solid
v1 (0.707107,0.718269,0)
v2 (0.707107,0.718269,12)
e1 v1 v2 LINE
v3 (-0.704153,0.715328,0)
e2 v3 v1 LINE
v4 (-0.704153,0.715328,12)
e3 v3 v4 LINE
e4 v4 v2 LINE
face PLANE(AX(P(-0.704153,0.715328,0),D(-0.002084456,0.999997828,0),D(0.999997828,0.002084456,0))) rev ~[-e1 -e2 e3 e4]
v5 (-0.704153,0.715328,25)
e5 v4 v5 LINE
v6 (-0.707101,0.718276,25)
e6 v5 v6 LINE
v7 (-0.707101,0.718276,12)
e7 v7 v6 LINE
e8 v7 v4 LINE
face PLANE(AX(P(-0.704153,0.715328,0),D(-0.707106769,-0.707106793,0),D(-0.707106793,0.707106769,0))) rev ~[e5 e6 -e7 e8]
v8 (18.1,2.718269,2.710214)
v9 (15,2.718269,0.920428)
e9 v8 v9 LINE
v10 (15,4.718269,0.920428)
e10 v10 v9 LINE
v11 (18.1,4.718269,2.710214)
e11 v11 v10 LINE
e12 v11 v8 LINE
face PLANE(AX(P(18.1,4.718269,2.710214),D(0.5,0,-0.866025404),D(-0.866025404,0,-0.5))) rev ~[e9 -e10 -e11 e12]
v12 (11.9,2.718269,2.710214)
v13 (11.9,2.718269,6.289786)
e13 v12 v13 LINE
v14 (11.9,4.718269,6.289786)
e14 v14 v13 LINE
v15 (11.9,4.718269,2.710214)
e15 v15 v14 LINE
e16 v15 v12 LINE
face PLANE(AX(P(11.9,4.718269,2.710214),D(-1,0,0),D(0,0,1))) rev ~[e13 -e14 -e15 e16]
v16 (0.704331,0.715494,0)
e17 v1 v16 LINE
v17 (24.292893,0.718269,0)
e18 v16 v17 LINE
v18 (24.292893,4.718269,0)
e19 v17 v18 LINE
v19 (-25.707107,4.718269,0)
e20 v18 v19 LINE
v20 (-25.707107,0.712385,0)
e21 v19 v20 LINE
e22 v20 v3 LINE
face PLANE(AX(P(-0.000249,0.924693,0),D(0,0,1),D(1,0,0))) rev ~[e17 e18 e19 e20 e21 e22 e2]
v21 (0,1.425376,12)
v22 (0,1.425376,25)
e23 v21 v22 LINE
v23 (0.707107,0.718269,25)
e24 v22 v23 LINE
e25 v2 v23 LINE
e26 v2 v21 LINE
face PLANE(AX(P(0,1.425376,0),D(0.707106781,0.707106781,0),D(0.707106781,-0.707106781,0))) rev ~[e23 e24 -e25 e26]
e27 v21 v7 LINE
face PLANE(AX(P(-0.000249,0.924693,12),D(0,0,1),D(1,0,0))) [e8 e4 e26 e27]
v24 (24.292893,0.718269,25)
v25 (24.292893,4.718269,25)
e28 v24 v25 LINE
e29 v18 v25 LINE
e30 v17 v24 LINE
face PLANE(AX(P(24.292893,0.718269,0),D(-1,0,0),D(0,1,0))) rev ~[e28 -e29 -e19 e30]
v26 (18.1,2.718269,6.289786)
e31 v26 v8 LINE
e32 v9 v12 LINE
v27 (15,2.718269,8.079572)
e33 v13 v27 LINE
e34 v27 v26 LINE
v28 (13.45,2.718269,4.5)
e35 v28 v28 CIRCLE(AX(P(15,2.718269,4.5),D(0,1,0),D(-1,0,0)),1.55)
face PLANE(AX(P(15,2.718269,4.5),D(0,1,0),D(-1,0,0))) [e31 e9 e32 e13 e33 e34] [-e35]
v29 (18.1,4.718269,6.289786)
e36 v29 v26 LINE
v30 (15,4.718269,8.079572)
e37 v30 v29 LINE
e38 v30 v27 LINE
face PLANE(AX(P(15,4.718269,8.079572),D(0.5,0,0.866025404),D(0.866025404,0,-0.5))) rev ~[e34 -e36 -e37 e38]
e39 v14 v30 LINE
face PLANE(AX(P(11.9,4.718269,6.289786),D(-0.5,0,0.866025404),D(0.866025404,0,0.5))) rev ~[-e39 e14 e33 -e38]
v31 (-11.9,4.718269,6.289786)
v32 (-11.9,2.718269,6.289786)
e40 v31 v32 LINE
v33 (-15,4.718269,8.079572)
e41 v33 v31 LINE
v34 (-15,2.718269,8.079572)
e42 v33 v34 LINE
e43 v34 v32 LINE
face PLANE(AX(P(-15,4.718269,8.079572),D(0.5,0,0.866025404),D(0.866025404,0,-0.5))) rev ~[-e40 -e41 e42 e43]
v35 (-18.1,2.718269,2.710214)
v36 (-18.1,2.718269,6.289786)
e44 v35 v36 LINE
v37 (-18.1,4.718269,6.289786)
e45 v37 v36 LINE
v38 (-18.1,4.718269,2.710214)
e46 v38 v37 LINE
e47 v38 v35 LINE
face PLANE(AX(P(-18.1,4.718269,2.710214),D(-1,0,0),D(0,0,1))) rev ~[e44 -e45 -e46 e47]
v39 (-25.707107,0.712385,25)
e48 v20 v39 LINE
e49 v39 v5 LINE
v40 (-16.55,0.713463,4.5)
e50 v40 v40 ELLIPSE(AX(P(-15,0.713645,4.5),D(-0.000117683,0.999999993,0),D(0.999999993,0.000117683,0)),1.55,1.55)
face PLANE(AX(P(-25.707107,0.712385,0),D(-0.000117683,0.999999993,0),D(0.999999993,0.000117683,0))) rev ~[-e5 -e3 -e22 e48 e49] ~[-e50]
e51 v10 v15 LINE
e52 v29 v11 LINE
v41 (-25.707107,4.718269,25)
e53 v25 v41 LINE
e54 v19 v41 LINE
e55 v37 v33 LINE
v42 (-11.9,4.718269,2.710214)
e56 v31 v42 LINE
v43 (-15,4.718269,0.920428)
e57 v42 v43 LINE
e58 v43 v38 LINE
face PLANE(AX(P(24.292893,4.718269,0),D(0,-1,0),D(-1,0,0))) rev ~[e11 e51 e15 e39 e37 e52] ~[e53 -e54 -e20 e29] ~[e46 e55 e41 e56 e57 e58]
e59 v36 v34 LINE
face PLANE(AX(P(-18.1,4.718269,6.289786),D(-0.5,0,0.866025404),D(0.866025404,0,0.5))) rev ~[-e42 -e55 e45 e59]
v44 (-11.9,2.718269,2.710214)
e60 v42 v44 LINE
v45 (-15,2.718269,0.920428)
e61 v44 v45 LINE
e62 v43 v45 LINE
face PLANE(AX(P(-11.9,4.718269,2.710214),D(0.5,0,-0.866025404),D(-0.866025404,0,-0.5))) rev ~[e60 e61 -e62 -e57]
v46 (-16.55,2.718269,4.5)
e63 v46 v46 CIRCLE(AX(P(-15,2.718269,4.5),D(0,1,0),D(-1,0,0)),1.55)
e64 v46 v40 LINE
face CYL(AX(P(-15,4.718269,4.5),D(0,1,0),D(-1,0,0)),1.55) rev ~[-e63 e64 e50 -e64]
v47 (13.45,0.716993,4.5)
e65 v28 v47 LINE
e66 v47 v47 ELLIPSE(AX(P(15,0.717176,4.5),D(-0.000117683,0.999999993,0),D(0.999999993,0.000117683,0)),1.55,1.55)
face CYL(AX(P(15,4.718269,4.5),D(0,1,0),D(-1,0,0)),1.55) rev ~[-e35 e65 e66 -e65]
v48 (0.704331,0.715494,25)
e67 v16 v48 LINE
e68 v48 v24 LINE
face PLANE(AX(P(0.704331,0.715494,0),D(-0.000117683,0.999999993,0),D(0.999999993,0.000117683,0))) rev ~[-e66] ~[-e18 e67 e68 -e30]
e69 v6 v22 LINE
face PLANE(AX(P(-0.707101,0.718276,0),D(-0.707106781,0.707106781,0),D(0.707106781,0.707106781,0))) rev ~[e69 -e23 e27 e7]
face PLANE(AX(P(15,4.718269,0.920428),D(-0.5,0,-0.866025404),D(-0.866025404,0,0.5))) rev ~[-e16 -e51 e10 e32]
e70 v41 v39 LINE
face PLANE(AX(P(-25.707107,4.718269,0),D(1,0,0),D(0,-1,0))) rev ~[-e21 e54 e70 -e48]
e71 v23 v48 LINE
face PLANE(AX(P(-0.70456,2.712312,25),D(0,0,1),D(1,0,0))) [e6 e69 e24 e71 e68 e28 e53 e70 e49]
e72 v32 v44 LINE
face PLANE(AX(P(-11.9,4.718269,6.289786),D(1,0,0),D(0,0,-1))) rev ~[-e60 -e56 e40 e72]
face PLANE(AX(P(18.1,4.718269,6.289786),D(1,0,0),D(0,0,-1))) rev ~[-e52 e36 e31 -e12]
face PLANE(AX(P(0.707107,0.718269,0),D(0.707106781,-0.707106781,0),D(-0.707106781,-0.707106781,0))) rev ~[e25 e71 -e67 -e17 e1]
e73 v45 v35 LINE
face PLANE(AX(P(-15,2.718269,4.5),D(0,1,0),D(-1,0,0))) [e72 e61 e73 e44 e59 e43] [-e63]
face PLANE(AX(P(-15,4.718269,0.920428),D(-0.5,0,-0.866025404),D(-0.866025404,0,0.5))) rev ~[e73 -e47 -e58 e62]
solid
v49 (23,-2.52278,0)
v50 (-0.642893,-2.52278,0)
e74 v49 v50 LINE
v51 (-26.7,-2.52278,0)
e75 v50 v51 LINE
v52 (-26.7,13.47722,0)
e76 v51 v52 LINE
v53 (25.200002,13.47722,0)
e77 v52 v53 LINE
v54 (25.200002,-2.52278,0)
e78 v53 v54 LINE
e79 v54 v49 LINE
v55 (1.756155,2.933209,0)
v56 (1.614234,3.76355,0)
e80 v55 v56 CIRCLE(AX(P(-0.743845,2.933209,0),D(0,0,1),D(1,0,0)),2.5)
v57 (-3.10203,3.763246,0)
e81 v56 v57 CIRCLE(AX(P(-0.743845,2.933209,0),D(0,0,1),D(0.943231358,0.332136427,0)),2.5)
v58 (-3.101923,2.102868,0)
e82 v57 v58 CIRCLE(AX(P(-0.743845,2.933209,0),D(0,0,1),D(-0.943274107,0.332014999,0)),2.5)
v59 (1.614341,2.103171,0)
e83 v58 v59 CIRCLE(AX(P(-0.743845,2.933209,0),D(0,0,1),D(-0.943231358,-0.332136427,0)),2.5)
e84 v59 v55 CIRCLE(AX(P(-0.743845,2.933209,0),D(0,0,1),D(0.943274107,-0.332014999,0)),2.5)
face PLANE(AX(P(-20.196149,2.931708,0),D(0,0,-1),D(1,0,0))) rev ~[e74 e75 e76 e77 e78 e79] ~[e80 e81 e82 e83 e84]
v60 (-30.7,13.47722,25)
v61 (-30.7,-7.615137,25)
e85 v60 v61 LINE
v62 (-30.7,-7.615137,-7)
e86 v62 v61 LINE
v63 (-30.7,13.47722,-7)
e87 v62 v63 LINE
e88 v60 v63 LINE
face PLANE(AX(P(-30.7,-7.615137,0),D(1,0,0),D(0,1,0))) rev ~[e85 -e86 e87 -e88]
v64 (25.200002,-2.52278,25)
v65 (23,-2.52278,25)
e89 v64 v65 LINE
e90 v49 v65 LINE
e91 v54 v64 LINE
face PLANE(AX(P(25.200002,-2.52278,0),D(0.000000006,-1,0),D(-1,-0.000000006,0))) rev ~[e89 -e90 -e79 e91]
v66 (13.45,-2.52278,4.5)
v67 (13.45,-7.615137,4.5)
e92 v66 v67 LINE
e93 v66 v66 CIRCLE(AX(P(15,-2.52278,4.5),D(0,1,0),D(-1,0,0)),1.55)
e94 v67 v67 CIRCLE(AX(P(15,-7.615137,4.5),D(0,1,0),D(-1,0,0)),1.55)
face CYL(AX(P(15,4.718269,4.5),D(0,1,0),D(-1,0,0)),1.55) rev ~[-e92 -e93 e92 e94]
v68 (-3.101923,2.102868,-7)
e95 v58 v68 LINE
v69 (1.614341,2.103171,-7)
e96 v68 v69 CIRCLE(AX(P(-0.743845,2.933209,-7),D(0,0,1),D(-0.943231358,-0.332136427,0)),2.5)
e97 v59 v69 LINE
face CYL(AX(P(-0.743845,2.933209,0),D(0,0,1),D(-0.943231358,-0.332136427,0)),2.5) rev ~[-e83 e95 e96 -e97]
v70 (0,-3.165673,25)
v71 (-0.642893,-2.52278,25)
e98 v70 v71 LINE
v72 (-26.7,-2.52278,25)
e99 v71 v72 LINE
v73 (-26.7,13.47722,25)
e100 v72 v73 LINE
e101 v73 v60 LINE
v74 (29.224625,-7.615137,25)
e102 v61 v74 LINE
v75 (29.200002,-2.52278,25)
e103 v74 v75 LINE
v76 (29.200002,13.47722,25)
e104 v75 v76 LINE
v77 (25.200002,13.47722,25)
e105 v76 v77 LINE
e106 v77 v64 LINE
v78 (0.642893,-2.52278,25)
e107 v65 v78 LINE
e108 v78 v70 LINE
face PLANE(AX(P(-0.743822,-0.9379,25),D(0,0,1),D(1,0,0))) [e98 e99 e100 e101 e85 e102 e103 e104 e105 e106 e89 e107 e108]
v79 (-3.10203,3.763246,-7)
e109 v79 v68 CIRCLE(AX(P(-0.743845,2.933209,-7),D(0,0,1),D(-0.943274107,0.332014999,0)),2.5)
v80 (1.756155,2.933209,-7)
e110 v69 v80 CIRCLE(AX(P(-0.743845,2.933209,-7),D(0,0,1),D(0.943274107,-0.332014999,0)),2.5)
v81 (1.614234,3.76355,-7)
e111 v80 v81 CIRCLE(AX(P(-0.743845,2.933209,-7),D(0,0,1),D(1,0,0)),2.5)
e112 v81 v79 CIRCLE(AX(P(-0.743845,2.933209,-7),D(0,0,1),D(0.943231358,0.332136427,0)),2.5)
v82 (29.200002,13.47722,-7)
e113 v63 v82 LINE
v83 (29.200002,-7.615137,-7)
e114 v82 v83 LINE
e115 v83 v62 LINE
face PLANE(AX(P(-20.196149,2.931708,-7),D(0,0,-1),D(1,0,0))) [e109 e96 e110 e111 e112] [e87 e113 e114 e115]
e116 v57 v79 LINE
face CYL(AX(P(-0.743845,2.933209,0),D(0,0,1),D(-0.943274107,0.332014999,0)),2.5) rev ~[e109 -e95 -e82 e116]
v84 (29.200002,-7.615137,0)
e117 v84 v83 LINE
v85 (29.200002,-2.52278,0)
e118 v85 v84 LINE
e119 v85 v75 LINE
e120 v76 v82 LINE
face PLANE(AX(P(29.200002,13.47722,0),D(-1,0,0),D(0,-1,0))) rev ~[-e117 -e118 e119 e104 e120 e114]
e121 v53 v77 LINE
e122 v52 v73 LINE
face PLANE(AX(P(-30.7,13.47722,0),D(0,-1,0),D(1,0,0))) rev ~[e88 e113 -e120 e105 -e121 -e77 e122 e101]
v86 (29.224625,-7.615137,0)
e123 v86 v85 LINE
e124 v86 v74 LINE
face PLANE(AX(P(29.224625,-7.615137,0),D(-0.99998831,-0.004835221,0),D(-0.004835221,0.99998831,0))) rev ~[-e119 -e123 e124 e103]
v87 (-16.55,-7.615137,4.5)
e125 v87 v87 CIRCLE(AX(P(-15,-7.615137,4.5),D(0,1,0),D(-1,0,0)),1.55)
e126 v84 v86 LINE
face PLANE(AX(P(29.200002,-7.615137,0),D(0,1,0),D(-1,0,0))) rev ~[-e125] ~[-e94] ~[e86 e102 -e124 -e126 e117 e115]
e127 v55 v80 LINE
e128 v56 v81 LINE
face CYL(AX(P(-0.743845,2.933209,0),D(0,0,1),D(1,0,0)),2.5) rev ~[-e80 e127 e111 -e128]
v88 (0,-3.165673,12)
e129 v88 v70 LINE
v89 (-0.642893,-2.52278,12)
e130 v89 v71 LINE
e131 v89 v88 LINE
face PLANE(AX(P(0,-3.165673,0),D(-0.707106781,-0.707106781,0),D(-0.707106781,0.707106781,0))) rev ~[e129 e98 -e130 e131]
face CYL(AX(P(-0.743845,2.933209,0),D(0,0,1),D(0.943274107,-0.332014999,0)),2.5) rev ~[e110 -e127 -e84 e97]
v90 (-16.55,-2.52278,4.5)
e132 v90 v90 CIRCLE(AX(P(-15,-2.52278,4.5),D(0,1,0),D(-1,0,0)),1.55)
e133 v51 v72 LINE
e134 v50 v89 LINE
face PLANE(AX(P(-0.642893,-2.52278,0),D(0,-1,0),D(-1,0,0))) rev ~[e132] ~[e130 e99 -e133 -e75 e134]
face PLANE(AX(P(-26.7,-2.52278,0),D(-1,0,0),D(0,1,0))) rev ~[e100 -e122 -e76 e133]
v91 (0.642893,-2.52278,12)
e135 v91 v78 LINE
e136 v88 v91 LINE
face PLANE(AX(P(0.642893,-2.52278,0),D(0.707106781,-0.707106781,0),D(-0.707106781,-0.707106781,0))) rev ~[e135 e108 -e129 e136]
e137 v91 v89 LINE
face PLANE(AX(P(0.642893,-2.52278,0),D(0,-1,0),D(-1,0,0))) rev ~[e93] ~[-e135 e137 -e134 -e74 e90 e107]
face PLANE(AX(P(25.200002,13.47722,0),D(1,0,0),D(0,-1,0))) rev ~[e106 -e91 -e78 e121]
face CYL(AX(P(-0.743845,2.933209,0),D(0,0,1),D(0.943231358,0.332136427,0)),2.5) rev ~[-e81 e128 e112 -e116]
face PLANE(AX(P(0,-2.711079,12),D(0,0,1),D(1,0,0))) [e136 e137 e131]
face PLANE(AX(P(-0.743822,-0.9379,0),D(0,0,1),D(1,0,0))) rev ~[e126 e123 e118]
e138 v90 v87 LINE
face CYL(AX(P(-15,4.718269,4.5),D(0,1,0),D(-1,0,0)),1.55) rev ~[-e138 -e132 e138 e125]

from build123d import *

# Parameters (mm, degrees)
F1_DEPTH = 25
F2_R     = 1.55
F3_DEPTH = 2
F4_DEPTH = 25
F6_DEPTH = 7
F7_DEPTH = 12


with BuildPart() as f1:
    # F0 (on Top) → F1 (new body)
    with BuildSketch(Plane.XY):
        Polygon((0, -3.165672766), (-0.6428928915, -2.5227798745), (-26.700000003, -2.5227798615), (-26.700000003, 13.4772201385), (-30.700000003, 13.4772201385), (-30.700000003, -2.5227798615), (-30.700000003, -7.615136914), (29.2246248573, -7.615136914), (29.2000018954, -2.5227798615), (29.2000018954, 13.4772201385), (25.2000018954, 13.4772201385), (25.2000018954, -2.5227798615), (23, -2.5227798745), (0.6428928915, -2.5227798745), align=None)
    extrude(amount=F1_DEPTH)


with BuildPart() as f1b:
    # F0 (on Top) → F1, piece 2 (new body)
    with BuildSketch(Plane.XY):
        Polygon((-0.7071006365, 0.7182756418), (0, 1.4253762783), (0.7071067812, 0.7182694971), (0.7043308199, 0.7154935358), (24.2928932188, 0.7182694971), (24.2928932188, 4.7182694971), (-25.7071067812, 4.7182694971), (-25.7071067812, 0.7123853715), (-0.7041527766, 0.715327782), align=None)
    extrude(amount=F1_DEPTH)

    # F2 (on face) → F3 (cut)
    with BuildSketch(Plane(origin=(0, 4.7182694971, 0), x_dir=(-1, 0, 0), z_dir=(0, 1, 0))):
        Polygon((-11.9, 2.7102141655), (-11.9, 6.2897858345), (-15, 8.079571669), (-18.1, 6.2897858345), (-18.1, 2.7102141655), (-15, 0.920428331), align=None)
        with Locations((-15, 4.5)):
            Circle(F2_R, mode=Mode.SUBTRACT)
        Polygon((11.9, 6.2897858345), (11.9, 2.7102141655), (15, 0.920428331), (18.1, 2.7102141655), (18.1, 6.2897858345), (15, 8.079571669), align=None)
        with Locations((15, 4.5)):
            Circle(F2_R, mode=Mode.SUBTRACT)
    extrude(amount=-F3_DEPTH, mode=Mode.SUBTRACT)


with BuildPart() as f4_tool:
    # F4 (cut): faces of the model
    f4_faces = [f1b.part.faces().sort_by_distance(p)[0] for p in [
        (-15, 4.7182694971, 4.5),
        (15, 4.7182694971, 4.5),
    ]]
    extrude(f4_faces, amount=-F4_DEPTH)


with BuildPart() as f1_1:
    add(f1.part)

    # F4: cut by f4_tool
    add(f4_tool.part, mode=Mode.SUBTRACT)

    # F5 (on face) → F6 (join)
    with BuildSketch(Plane(origin=(0, 0, 0), x_dir=(1, 0, 0), z_dir=(0, 0, -1))):
        with BuildLine():
            Line((-3.1019229725, -2.1028676977), (-30.700000003, 7.615136914))
            Line((-30.700000003, 7.615136914), (-30.700000003, -13.4772201385))
            Line((-30.700000003, -13.4772201385), (-3.1020298452, -3.7632462614))
            ThreePointArc((-3.1020298452, -3.7632462614), (-3.2438445731, -2.933047848), (-3.1019229725, -2.1028676977))
        make_face()
        with BuildLine():
            Line((29.2000018954, 7.615136914), (-30.700000003, 7.615136914))
            Line((-30.700000003, 7.615136914), (-3.1019229725, -2.1028676977))
            ThreePointArc((-3.1019229725, -2.1028676977), (-0.7436836622, -0.4332087692), (1.6143406887, -2.1031712668))
            Line((1.6143406887, -2.1031712668), (29.2000018954, 7.6064700878))
            Line((29.2000018954, 7.6064700878), (29.2000018954, 7.615136914))
        make_face()
        with BuildLine():
            Line((-3.1020298452, -3.7632462614), (-30.700000003, -13.4772201385))
            Line((-30.700000003, -13.4772201385), (29.2000018954, -13.4772201385))
            Line((29.2000018954, -13.4772201385), (1.614233816, -3.7635498304))
            ThreePointArc((1.614233816, -3.7635498304), (-0.7440054943, -5.4332087589), (-3.1020298452, -3.7632462614))
        make_face()
        with BuildLine():
            Line((29.2000018954, -13.4772201385), (29.2000018954, 7.6064700878))
            Line((29.2000018954, 7.6064700878), (1.6143406887, -2.1031712668))
            ThreePointArc((1.6143406887, -2.1031712668), (1.7204467161, -2.5121762043), (1.7561554217, -2.9332087641))
            ThreePointArc((1.7561554217, -2.9332087641), (1.7204196107, -3.3543999405), (1.614233816, -3.7635498304))
            Line((1.614233816, -3.7635498304), (29.2000018954, -13.4772201385))
        make_face()
    extrude(amount=F6_DEPTH)

    # F0 (on Top) → F7, piece 2 (join)
    with BuildSketch(Plane.XY):
        Polygon((0.6428928915, -2.5227798745), (-0.6428928915, -2.5227798745), (0, -3.165672766), align=None)
    extrude(amount=F7_DEPTH)


with BuildPart() as f1b_1:
    add(f1b.part)

    # F4: cut by f4_tool
    add(f4_tool.part, mode=Mode.SUBTRACT)

    # F0 (on Top) → F7 (join)
    with BuildSketch(Plane.XY):
        Polygon((0.7071067812, 0.7182694971), (0, 1.4253762783), (-0.7071006365, 0.7182756418), (-0.7041527766, 0.715327782), align=None)
    extrude(amount=F7_DEPTH)


solid = Compound([f1_1.part, f1b_1.part])
